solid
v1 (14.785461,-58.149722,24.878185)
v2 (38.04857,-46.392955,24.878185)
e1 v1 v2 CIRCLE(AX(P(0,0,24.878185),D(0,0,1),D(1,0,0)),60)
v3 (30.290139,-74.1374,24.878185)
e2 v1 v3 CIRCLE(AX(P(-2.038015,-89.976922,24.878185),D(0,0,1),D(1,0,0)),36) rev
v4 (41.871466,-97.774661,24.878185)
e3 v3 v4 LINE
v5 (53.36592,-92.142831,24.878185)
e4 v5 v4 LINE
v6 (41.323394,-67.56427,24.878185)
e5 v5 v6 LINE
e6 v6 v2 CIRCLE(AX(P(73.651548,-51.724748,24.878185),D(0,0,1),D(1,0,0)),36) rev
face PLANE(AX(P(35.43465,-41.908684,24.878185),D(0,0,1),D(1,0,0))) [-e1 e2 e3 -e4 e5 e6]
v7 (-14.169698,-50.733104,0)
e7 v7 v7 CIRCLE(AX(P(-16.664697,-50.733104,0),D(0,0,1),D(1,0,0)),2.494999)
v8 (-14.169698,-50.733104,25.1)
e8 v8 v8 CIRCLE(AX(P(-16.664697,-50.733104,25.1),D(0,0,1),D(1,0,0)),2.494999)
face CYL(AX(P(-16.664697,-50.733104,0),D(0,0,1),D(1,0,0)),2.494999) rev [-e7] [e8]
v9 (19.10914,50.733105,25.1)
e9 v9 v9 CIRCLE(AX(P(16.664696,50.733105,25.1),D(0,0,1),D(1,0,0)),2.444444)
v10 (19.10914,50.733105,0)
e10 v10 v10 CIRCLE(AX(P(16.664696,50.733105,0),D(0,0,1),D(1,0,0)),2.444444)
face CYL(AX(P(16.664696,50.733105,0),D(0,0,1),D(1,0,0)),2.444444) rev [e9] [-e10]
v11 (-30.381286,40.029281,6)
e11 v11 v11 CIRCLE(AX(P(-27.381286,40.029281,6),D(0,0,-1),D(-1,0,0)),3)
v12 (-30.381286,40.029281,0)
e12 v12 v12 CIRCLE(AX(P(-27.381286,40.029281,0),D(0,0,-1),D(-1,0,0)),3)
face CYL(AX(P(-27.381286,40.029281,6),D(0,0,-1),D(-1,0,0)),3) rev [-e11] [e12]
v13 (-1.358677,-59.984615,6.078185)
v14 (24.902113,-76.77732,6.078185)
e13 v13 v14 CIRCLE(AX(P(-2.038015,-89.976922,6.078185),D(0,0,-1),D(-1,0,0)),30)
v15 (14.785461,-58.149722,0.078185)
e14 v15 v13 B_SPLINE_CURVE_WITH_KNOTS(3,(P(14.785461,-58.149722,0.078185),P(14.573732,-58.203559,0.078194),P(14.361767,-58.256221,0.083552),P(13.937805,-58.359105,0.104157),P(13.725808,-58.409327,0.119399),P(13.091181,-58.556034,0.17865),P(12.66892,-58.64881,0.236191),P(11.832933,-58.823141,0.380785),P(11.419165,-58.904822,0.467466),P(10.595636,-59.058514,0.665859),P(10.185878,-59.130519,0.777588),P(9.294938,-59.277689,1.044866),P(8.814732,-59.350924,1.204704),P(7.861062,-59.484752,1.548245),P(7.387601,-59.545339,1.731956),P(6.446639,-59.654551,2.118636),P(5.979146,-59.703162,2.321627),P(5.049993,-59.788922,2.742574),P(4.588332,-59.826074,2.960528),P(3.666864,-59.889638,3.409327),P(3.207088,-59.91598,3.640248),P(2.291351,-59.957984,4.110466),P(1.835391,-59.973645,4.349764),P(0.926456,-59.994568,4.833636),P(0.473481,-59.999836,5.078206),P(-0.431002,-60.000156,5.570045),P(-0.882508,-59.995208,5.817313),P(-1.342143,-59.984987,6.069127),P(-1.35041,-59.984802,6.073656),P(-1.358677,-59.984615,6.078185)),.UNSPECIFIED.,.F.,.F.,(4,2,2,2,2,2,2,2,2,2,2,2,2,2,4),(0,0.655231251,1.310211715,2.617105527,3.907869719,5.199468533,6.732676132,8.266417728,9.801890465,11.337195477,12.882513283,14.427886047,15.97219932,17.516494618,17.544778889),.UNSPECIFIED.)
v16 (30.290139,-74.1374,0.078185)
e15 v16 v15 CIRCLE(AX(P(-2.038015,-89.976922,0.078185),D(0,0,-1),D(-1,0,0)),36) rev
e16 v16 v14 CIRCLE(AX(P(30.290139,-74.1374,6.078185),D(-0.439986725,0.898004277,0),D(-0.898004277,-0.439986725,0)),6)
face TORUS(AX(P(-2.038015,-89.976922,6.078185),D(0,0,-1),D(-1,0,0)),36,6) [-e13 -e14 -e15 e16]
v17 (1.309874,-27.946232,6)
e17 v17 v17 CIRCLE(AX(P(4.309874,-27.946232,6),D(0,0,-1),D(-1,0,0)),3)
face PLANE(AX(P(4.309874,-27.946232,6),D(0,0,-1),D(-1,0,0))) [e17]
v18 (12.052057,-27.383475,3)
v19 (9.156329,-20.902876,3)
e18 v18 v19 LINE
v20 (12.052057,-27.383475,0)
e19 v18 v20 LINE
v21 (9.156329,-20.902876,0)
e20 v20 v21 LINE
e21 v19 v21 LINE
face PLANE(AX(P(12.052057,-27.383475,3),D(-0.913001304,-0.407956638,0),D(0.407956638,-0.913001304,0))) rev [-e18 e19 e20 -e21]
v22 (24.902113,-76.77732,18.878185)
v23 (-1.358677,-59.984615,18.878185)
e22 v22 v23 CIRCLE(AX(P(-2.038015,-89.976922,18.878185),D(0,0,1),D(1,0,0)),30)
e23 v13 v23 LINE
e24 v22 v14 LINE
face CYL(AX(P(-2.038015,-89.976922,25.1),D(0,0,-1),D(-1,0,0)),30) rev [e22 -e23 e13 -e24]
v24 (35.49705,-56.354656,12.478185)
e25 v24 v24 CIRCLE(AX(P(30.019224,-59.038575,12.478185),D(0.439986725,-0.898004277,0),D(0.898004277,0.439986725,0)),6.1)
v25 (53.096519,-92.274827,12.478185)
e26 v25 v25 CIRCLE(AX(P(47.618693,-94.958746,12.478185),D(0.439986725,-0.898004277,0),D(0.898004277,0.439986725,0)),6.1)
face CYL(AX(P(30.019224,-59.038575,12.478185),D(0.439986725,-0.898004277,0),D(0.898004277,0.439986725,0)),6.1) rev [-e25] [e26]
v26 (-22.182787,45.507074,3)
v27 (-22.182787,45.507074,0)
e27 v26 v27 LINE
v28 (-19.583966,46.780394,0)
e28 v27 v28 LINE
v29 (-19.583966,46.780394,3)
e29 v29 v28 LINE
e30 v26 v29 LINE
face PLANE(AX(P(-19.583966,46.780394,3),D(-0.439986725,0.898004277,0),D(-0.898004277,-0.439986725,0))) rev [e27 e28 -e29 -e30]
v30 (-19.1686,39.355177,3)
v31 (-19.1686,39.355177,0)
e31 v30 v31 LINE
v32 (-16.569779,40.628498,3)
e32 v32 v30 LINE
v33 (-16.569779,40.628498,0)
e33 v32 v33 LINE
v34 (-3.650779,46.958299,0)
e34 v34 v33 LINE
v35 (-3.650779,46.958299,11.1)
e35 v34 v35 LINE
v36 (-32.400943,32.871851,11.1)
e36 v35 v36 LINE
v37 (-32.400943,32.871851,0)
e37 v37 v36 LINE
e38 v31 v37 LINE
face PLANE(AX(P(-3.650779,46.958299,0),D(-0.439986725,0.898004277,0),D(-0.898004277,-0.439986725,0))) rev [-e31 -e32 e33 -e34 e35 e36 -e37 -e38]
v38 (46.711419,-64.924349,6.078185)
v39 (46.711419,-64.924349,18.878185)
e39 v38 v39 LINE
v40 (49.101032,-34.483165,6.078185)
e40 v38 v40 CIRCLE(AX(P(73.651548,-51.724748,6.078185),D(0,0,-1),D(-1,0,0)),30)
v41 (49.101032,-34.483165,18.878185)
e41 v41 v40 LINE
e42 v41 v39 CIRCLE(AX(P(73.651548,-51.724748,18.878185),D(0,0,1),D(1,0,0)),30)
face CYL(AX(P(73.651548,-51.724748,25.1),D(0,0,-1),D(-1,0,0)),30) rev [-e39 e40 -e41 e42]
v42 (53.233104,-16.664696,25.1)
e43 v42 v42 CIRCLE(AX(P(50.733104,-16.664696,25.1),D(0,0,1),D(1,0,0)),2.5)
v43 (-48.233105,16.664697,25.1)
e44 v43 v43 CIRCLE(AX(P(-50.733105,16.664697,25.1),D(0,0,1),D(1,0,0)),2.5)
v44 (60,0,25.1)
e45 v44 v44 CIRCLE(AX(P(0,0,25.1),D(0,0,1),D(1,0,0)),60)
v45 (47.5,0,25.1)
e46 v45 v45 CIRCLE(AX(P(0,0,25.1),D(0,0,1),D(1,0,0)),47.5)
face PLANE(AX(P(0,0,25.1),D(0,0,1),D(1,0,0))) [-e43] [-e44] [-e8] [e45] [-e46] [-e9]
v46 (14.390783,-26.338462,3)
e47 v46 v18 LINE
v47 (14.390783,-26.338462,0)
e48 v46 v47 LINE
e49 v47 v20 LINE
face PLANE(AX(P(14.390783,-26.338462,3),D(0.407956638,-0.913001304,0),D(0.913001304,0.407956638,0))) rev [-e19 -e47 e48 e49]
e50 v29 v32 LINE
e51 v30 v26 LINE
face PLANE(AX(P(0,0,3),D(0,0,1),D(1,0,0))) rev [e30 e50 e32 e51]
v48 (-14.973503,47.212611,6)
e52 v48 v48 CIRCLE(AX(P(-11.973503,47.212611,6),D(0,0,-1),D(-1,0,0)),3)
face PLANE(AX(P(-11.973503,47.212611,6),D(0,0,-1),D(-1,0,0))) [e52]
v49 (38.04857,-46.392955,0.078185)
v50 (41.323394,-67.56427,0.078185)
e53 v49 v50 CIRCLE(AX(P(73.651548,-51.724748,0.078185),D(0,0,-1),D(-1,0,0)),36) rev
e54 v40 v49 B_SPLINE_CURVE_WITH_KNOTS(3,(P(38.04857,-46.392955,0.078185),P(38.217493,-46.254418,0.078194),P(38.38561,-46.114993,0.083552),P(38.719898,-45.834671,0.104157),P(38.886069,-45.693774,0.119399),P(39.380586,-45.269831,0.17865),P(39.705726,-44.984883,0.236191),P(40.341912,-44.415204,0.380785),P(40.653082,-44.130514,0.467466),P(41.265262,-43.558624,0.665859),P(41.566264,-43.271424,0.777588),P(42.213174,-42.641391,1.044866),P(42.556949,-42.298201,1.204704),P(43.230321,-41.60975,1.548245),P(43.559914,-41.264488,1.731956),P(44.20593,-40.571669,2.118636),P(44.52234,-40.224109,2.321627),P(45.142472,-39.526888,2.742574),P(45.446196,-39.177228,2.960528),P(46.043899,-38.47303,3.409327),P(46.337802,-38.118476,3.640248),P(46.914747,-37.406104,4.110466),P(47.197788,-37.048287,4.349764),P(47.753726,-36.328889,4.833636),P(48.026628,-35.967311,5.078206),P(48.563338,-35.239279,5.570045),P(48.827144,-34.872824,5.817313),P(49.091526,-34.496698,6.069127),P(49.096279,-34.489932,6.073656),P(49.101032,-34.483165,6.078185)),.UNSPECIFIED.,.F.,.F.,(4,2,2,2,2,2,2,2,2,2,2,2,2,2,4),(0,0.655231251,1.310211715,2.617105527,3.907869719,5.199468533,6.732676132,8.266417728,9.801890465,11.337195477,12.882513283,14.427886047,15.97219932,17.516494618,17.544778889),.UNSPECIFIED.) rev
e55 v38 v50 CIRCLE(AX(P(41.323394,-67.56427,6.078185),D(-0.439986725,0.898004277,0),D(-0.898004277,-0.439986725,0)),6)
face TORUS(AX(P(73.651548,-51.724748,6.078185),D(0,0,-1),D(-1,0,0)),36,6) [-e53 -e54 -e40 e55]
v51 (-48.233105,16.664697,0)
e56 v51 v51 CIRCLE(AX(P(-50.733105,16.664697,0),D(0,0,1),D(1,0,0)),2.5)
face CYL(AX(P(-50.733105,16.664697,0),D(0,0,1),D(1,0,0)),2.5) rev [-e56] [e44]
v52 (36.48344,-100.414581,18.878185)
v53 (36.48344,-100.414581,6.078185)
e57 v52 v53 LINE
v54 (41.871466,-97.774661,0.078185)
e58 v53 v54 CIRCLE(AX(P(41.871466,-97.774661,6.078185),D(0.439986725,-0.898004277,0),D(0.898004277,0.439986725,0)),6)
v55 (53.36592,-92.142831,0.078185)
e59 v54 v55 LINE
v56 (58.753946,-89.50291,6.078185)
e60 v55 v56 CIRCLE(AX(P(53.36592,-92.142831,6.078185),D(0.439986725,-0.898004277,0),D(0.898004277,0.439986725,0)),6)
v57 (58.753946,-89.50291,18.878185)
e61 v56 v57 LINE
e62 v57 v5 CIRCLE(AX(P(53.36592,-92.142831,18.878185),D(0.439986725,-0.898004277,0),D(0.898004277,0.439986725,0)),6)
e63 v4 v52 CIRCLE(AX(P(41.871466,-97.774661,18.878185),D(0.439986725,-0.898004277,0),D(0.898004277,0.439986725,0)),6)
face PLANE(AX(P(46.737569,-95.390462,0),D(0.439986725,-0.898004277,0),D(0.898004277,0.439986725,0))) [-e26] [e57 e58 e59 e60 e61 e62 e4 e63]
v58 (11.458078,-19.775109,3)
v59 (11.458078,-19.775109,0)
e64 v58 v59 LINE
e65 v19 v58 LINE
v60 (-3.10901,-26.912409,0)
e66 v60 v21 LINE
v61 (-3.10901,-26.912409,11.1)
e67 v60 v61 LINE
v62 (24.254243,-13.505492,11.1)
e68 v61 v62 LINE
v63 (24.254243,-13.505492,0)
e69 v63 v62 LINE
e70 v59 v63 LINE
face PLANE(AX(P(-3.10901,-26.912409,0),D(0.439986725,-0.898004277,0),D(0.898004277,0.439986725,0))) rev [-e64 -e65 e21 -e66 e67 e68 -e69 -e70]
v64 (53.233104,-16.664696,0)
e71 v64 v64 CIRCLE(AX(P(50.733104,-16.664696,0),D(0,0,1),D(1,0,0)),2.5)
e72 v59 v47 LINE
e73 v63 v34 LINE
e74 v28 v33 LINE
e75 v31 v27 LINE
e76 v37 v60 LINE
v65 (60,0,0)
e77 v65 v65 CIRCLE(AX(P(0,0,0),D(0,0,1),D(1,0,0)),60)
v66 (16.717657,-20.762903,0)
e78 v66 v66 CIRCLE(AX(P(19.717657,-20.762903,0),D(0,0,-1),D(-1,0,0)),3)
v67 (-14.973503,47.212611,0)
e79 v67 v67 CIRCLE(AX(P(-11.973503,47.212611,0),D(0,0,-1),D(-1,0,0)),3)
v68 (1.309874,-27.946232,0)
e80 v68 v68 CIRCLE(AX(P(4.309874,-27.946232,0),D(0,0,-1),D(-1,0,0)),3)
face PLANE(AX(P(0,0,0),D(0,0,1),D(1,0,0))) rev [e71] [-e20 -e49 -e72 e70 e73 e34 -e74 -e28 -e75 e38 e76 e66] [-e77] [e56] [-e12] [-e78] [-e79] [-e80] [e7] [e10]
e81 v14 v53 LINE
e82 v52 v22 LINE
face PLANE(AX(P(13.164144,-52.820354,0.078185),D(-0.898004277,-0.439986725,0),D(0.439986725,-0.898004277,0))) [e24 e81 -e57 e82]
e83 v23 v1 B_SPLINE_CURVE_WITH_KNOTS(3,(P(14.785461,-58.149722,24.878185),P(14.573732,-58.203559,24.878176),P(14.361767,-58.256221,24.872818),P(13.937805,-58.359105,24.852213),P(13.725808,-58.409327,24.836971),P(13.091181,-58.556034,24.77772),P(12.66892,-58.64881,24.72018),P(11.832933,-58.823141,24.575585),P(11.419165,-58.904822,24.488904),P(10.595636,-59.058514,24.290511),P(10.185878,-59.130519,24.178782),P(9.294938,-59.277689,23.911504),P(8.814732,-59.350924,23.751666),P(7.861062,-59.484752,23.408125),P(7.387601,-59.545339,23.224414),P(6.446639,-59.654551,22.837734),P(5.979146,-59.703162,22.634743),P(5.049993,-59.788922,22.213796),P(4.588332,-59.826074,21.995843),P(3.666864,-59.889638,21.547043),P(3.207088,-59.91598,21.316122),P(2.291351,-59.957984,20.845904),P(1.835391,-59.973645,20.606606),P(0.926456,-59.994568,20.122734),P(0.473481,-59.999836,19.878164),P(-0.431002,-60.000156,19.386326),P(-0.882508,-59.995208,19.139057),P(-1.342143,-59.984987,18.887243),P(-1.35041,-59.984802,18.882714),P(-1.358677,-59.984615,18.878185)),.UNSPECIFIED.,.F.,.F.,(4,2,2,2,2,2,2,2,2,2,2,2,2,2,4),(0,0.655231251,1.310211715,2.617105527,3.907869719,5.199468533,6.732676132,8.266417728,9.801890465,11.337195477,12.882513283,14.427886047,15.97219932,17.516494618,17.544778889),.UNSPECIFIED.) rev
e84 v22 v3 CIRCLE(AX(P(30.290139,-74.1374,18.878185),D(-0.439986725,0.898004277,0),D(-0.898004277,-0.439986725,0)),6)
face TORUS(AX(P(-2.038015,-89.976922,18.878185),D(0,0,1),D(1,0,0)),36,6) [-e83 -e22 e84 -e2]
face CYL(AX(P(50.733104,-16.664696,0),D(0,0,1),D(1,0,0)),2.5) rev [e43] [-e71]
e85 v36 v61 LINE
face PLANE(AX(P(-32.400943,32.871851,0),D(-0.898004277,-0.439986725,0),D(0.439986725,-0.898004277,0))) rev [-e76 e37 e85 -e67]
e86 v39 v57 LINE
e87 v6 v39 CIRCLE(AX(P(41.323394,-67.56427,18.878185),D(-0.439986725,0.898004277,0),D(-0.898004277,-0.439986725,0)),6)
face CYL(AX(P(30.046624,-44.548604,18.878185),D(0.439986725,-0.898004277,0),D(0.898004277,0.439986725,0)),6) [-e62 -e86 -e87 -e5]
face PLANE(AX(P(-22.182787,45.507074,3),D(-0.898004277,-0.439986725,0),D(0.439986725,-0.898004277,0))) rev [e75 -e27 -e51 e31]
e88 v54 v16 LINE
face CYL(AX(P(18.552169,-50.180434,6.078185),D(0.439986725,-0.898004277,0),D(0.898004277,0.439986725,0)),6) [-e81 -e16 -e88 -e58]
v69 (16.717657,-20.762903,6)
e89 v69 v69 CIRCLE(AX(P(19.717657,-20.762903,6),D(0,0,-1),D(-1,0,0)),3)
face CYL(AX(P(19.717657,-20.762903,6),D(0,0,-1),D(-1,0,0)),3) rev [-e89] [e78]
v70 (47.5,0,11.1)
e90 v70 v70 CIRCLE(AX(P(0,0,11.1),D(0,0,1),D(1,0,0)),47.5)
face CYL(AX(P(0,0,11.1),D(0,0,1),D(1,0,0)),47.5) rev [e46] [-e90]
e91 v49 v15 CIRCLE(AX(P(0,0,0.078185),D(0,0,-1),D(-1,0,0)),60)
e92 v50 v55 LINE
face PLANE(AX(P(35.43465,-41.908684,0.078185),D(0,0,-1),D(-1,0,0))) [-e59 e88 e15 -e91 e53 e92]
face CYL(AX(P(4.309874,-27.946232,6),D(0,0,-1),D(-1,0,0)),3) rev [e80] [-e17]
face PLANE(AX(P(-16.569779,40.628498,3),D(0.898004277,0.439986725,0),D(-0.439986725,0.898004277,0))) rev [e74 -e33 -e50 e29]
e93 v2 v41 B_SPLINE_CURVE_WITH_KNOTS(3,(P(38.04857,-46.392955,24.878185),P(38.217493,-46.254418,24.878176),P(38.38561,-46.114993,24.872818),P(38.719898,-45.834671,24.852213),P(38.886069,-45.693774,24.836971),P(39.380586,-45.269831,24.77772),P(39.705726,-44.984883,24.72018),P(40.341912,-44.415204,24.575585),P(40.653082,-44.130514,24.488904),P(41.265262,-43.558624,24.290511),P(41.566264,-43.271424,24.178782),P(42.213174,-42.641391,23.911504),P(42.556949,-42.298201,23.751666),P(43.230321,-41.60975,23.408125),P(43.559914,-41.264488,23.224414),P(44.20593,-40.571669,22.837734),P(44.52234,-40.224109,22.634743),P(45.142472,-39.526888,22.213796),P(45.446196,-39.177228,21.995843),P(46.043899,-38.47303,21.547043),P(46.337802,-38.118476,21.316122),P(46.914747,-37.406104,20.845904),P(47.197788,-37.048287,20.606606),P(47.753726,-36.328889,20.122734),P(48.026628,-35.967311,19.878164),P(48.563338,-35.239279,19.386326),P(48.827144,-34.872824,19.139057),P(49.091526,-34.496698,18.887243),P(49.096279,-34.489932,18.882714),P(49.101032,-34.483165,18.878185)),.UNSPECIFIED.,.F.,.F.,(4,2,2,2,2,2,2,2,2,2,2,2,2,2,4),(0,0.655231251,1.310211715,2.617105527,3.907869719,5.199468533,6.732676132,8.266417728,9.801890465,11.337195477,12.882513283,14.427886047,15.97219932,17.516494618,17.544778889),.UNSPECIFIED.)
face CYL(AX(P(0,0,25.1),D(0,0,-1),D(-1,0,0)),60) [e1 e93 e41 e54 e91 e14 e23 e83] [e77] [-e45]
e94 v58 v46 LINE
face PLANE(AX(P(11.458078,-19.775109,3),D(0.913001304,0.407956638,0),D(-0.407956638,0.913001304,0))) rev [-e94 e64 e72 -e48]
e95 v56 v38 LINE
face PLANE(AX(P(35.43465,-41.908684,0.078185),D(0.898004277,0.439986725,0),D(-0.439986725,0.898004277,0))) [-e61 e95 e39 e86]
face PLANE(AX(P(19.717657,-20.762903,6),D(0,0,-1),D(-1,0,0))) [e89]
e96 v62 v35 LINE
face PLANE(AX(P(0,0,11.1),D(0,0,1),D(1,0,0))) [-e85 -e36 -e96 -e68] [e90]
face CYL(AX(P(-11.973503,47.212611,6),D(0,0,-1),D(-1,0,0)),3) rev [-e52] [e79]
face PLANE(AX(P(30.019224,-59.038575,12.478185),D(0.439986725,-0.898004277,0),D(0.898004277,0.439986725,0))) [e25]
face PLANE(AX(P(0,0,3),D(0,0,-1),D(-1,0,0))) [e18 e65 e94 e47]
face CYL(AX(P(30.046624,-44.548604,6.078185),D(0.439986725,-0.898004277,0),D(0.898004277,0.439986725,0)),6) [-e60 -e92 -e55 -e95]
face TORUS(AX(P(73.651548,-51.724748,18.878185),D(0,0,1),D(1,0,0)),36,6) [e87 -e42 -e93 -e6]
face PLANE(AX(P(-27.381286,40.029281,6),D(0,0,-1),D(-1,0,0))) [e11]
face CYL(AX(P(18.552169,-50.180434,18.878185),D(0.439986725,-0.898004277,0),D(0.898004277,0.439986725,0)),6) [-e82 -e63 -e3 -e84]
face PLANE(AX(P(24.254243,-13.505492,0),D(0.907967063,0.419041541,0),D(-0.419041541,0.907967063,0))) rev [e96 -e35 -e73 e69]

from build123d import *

# Parameters (mm, degrees)
SKETCH1_R                = 60
BOSS_EXTRUDE1_DEPTH      = 25.1
SKETCH3_R                = 47.5
CUT_EXTRUDE2_DEPTH       = 14
CUT_EXTRUDE5_DEPTH       = 89.487343728
CUT_EXTRUDE5_DEPTH_BACK  = 89.487343728
SKETCH2_R                = 2.494998654
SKETCH2_R_2              = 2.5
SKETCH2_R_3              = 2.444443829
SKETCH6_R                = 3
CUT_EXTRUDE6_DEPTH       = 6
CUT_EXTRUDE7_DEPTH       = 87
CUT_EXTRUDE7_DEPTH_BACK  = 87
BOSS_EXTRUDE2_DEPTH      = 30
BOSS_EXTRUDE2_DEPTH_BACK = 23
SKETCH8_W                = 24.8
SKETCH8_H                = 24.8
FILLET1_R                = 30
SKETCH9_R                = 6.1
CUT_EXTRUDE8_DEPTH       = 40
FILLET2_R                = 6
CUT_EXTRUDE9_DEPTH       = 3


with BuildPart() as part:
    # Sketch1 → Boss-Extrude1 (new body)
    with BuildSketch(Plane.XY):
        Circle(SKETCH1_R)
    extrude(amount=BOSS_EXTRUDE1_DEPTH)

    # Sketch3 → Cut-Extrude2 (cut)
    with BuildSketch(Plane.XY.offset(25.1)):
        Circle(SKETCH3_R)
    extrude(amount=-CUT_EXTRUDE2_DEPTH, mode=Mode.SUBTRACT)

    # Sketch2 → Cut-Extrude5 (cut, two sides: drawn at the far end of the back side and taken through both)
    with BuildSketch(Plane.XY.offset(25.1).offset(-CUT_EXTRUDE5_DEPTH_BACK)):
        with Locations((-16.664697145, -50.733104448)):
            Circle(SKETCH2_R)
        with Locations((-50.733105114, 16.664696544)):
            Circle(SKETCH2_R_2)
        with Locations((16.664695878, 50.733104512)):
            Circle(SKETCH2_R_3)
        with Locations((50.733103846, -16.66469648)):
            Circle(SKETCH2_R_2)
    extrude(amount=CUT_EXTRUDE5_DEPTH + CUT_EXTRUDE5_DEPTH_BACK, mode=Mode.SUBTRACT)

    # Sketch6 → Cut-Extrude6 (cut)
    with BuildSketch(Plane(origin=(0, 0, 0), x_dir=(-1, 0, 0), z_dir=(0, 0, -1))):
        with Locations((11.973502988, 47.212610548)):
            Circle(SKETCH6_R)
        with Locations((27.381285989, 40.029281029)):
            Circle(SKETCH6_R)
        with Locations((-19.717656658, -20.762902692)):
            Circle(SKETCH6_R)
        with Locations((-4.309873657, -27.946232212)):
            Circle(SKETCH6_R)
    extrude(amount=-CUT_EXTRUDE6_DEPTH, mode=Mode.SUBTRACT)

    # Sketch7 → Cut-Extrude7 (cut, two sides: drawn at the far end of the back side and taken through both)
    with BuildSketch(Plane.XY.offset(11.1).offset(-CUT_EXTRUDE7_DEPTH_BACK)):
        Polygon((-32.400942803, 32.871850778), (-3.10901045, -26.912408633), (24.254242539, -13.505492441), (-3.650778768, 46.958298756), align=None)
    extrude(amount=CUT_EXTRUDE7_DEPTH + CUT_EXTRUDE7_DEPTH_BACK, mode=Mode.SUBTRACT)

    # Sketch8 → Boss-Extrude2 (add, two sides: drawn at the far end of the back side and taken through both)
    with BuildSketch(Plane(origin=(33.53796733, -68.45033352, 0), x_dir=(-0.8980042769467113, -0.4399867254650012, 0), z_dir=(0.4399867254650012, -0.8980042769467113, 0)).offset(-BOSS_EXTRUDE2_DEPTH_BACK)):
        with Locations((-0.981202476, -12.478185074)):
            Rectangle(SKETCH8_W, SKETCH8_H)
    extrude(amount=BOSS_EXTRUDE2_DEPTH + BOSS_EXTRUDE2_DEPTH_BACK)

    # Fillet1
    fillet1_edges = [part.edges().sort_by_distance(p)[0] for p in [
        (37.75068654, -46.635669457, 12.478185074),
        (15.662587056, -57.91962851, 12.478185074),
    ]]
    fillet(fillet1_edges, radius=FILLET1_R)

    # Sketch9 → Cut-Extrude8 (cut)
    with BuildSketch(Plane(origin=(46.737569094, -95.390461829, 0), x_dir=(0.8980042769467111, 0.43998672546500134, 0), z_dir=(0.43998672546500134, -0.8980042769467111, 0))):
        with Locations((0.981202476, 12.478185074)):
            Circle(SKETCH9_R)
    extrude(amount=-CUT_EXTRUDE8_DEPTH, mode=Mode.SUBTRACT)

    # Fillet2
    # the kernel refuses this fillet: 6 mm, written as the material it takes off along each edge
    with BuildSketch(Plane(origin=(43.083240962, -113.884645314, 0.078185074), x_dir=(0.8980042769467113, 0.4399867254650012, 0), z_dir=(-0.43998672546500117, 0.8980042769467113, 0))) as fillet2_piece_1:
        with BuildLine():
            CenterArc((FILLET2_R, -FILLET2_R), FILLET2_R, 90, 90)
            Line((0, -FILLET2_R), (0, 0))
            Line((0, 0), (FILLET2_R, 0))
        make_face()
    extrude(amount=41.321991464, mode=Mode.SUBTRACT)
    with BuildSketch(Plane(origin=(43.083240962, -113.884645314, 24.878185074), x_dir=(0.8980042769467111, 0.4399867254650013, 0), z_dir=(-0.4399867254650013, 0.8980042769467113, 0))) as fillet2_piece_2:
        with BuildLine():
            CenterArc((FILLET2_R, FILLET2_R), FILLET2_R, 180, 90)
            Line((0, FILLET2_R), (0, 0))
            Line((0, 0), (FILLET2_R, 0))
        make_face()
    extrude(amount=41.321991464, mode=Mode.SUBTRACT)
    with BuildSketch(Plane(origin=(46.711419385, -64.924349442, 24.878185074), x_dir=(-0.8980042769467113, -0.4399867254650012, 0), z_dir=(0.4399867254650012, -0.8980042769467113, 0))) as fillet2_piece_3:
        with BuildLine():
            CenterArc((FILLET2_R, FILLET2_R), FILLET2_R, 180, 90)
            Line((0, FILLET2_R), (0, 0))
            Line((0, 0), (FILLET2_R, 0))
        make_face()
    extrude(amount=42.37020475, mode=Mode.SUBTRACT)
    with BuildSketch(Plane(origin=(46.711419385, -64.924349442, 0.078185074), x_dir=(-0.8980042769467113, -0.4399867254650012, 0), z_dir=(0.43998672546500117, -0.8980042769467113, 0))) as fillet2_piece_4:
        with BuildLine():
            CenterArc((FILLET2_R, -FILLET2_R), FILLET2_R, 90, 90)
            Line((0, -FILLET2_R), (0, 0))
            Line((0, 0), (FILLET2_R, 0))
        make_face()
    extrude(amount=42.37020475, mode=Mode.SUBTRACT)
    with BuildSketch(Plane(origin=(-2.03801506, -89.976922011, 24.878185074), x_dir=(-0.45951638072731243, 0.8881692945848058, 0), z_dir=(-0.8881692945848058, -0.45951638072731243, 0))) as fillet2_piece_5_section:
        with BuildLine():
            CenterArc((30 + FILLET2_R, FILLET2_R), FILLET2_R, 180, 90)
            Line((30, FILLET2_R), (30, 0))
            Line((30, 0), (30 + FILLET2_R, 0))
        make_face()
    fillet2_piece_5 = revolve(axis=Axis((-2.03801506, -89.976922011, 24.878185074), (0, 0, -1)), revolution_arc=91.252870665, mode=Mode.PRIVATE)
    fillet2_piece_5 = fillet2_piece_5 - Plane(origin=(0, 0, 24.878185074), x_dir=(1, 0, 0), z_dir=(0, 0, -1)) * Cylinder(60, 144, mode=Mode.PRIVATE)
    add(fillet2_piece_5, mode=Mode.SUBTRACT)
    with BuildSketch(Plane(origin=(-2.03801506, -89.976922011, 0.078185074), x_dir=(-0.45951638072731255, 0.8881692945848058, 0), z_dir=(-0.8881692945848058, -0.45951638072731255, 0))) as fillet2_piece_6_section:
        with BuildLine():
            CenterArc((30 + FILLET2_R, -FILLET2_R), FILLET2_R, 90, 90)
            Line((30 + FILLET2_R, 0), (30, 0))
            Line((30, 0), (30, -FILLET2_R))
        make_face()
    fillet2_piece_6 = revolve(axis=Axis((-2.03801506, -89.976922011, 0.078185074), (0, 0, -1)), revolution_arc=91.252870665, mode=Mode.PRIVATE)
    fillet2_piece_6 = fillet2_piece_6 - Plane(origin=(0, 0, 0.078185074), x_dir=(1, 0, 0), z_dir=(0, 0, -1)) * Cylinder(60, 144, mode=Mode.PRIVATE)
    add(fillet2_piece_6, mode=Mode.SUBTRACT)
    with BuildSketch(Plane(origin=(73.651547694, -51.724747678, 0.078185074), x_dir=(-0.44255176351936526, 0.8967429601652304, 0), z_dir=(0.8967429601652304, 0.44255176351936526, 0))) as fillet2_piece_7_section:
        with BuildLine():
            CenterArc((30 + FILLET2_R, FILLET2_R), FILLET2_R, 180, 90)
            Line((30 + FILLET2_R, 0), (30, 0))
            Line((30, 0), (30, FILLET2_R))
        make_face()
    fillet2_piece_7 = revolve(axis=Axis((73.651547694, -51.724747678, 0.078185074), (0, 0, 1)), revolution_arc=89.836226794, mode=Mode.PRIVATE)
    fillet2_piece_7 = fillet2_piece_7 - Plane(origin=(0, 0, 0.078185074), x_dir=(1, 0, 0), z_dir=(0, 0, -1)) * Cylinder(60, 144, mode=Mode.PRIVATE)
    add(fillet2_piece_7, mode=Mode.SUBTRACT)
    with BuildSketch(Plane(origin=(73.651547694, -51.724747678, 24.878185074), x_dir=(-0.44255176351936476, 0.8967429601652306, 0), z_dir=(0.8967429601652306, 0.44255176351936476, 0))) as fillet2_piece_8_section:
        with BuildLine():
            CenterArc((30 + FILLET2_R, -FILLET2_R), FILLET2_R, 90, 90)
            Line((30 + FILLET2_R, 0), (30, 0))
            Line((30, 0), (30, -FILLET2_R))
        make_face()
    fillet2_piece_8 = revolve(axis=Axis((73.651547694, -51.724747678, 24.878185074), (0, 0, 1)), revolution_arc=89.836226794, mode=Mode.PRIVATE)
    fillet2_piece_8 = fillet2_piece_8 - Plane(origin=(0, 0, 24.878185074), x_dir=(1, 0, 0), z_dir=(0, 0, -1)) * Cylinder(60, 144, mode=Mode.PRIVATE)
    add(fillet2_piece_8, mode=Mode.SUBTRACT)

    # Sketch12 → Cut-Extrude9 (cut)
    with BuildSketch(Plane(origin=(0, 0, 0), x_dir=(-1, 0, 0), z_dir=(0, 0, -1))):
        Polygon((16.569778792, 40.628497592), (19.583965842, 46.780394242), (22.182787305, 45.507074086), (19.168600256, 39.355177436), align=None)
        Polygon((-11.458078278, -19.775108918), (-14.390783054, -26.33846158), (-12.052056845, -27.383475291), (-9.156328603, -20.902875599), align=None)
    extrude(amount=-CUT_EXTRUDE9_DEPTH, mode=Mode.SUBTRACT)


solid = part.part
